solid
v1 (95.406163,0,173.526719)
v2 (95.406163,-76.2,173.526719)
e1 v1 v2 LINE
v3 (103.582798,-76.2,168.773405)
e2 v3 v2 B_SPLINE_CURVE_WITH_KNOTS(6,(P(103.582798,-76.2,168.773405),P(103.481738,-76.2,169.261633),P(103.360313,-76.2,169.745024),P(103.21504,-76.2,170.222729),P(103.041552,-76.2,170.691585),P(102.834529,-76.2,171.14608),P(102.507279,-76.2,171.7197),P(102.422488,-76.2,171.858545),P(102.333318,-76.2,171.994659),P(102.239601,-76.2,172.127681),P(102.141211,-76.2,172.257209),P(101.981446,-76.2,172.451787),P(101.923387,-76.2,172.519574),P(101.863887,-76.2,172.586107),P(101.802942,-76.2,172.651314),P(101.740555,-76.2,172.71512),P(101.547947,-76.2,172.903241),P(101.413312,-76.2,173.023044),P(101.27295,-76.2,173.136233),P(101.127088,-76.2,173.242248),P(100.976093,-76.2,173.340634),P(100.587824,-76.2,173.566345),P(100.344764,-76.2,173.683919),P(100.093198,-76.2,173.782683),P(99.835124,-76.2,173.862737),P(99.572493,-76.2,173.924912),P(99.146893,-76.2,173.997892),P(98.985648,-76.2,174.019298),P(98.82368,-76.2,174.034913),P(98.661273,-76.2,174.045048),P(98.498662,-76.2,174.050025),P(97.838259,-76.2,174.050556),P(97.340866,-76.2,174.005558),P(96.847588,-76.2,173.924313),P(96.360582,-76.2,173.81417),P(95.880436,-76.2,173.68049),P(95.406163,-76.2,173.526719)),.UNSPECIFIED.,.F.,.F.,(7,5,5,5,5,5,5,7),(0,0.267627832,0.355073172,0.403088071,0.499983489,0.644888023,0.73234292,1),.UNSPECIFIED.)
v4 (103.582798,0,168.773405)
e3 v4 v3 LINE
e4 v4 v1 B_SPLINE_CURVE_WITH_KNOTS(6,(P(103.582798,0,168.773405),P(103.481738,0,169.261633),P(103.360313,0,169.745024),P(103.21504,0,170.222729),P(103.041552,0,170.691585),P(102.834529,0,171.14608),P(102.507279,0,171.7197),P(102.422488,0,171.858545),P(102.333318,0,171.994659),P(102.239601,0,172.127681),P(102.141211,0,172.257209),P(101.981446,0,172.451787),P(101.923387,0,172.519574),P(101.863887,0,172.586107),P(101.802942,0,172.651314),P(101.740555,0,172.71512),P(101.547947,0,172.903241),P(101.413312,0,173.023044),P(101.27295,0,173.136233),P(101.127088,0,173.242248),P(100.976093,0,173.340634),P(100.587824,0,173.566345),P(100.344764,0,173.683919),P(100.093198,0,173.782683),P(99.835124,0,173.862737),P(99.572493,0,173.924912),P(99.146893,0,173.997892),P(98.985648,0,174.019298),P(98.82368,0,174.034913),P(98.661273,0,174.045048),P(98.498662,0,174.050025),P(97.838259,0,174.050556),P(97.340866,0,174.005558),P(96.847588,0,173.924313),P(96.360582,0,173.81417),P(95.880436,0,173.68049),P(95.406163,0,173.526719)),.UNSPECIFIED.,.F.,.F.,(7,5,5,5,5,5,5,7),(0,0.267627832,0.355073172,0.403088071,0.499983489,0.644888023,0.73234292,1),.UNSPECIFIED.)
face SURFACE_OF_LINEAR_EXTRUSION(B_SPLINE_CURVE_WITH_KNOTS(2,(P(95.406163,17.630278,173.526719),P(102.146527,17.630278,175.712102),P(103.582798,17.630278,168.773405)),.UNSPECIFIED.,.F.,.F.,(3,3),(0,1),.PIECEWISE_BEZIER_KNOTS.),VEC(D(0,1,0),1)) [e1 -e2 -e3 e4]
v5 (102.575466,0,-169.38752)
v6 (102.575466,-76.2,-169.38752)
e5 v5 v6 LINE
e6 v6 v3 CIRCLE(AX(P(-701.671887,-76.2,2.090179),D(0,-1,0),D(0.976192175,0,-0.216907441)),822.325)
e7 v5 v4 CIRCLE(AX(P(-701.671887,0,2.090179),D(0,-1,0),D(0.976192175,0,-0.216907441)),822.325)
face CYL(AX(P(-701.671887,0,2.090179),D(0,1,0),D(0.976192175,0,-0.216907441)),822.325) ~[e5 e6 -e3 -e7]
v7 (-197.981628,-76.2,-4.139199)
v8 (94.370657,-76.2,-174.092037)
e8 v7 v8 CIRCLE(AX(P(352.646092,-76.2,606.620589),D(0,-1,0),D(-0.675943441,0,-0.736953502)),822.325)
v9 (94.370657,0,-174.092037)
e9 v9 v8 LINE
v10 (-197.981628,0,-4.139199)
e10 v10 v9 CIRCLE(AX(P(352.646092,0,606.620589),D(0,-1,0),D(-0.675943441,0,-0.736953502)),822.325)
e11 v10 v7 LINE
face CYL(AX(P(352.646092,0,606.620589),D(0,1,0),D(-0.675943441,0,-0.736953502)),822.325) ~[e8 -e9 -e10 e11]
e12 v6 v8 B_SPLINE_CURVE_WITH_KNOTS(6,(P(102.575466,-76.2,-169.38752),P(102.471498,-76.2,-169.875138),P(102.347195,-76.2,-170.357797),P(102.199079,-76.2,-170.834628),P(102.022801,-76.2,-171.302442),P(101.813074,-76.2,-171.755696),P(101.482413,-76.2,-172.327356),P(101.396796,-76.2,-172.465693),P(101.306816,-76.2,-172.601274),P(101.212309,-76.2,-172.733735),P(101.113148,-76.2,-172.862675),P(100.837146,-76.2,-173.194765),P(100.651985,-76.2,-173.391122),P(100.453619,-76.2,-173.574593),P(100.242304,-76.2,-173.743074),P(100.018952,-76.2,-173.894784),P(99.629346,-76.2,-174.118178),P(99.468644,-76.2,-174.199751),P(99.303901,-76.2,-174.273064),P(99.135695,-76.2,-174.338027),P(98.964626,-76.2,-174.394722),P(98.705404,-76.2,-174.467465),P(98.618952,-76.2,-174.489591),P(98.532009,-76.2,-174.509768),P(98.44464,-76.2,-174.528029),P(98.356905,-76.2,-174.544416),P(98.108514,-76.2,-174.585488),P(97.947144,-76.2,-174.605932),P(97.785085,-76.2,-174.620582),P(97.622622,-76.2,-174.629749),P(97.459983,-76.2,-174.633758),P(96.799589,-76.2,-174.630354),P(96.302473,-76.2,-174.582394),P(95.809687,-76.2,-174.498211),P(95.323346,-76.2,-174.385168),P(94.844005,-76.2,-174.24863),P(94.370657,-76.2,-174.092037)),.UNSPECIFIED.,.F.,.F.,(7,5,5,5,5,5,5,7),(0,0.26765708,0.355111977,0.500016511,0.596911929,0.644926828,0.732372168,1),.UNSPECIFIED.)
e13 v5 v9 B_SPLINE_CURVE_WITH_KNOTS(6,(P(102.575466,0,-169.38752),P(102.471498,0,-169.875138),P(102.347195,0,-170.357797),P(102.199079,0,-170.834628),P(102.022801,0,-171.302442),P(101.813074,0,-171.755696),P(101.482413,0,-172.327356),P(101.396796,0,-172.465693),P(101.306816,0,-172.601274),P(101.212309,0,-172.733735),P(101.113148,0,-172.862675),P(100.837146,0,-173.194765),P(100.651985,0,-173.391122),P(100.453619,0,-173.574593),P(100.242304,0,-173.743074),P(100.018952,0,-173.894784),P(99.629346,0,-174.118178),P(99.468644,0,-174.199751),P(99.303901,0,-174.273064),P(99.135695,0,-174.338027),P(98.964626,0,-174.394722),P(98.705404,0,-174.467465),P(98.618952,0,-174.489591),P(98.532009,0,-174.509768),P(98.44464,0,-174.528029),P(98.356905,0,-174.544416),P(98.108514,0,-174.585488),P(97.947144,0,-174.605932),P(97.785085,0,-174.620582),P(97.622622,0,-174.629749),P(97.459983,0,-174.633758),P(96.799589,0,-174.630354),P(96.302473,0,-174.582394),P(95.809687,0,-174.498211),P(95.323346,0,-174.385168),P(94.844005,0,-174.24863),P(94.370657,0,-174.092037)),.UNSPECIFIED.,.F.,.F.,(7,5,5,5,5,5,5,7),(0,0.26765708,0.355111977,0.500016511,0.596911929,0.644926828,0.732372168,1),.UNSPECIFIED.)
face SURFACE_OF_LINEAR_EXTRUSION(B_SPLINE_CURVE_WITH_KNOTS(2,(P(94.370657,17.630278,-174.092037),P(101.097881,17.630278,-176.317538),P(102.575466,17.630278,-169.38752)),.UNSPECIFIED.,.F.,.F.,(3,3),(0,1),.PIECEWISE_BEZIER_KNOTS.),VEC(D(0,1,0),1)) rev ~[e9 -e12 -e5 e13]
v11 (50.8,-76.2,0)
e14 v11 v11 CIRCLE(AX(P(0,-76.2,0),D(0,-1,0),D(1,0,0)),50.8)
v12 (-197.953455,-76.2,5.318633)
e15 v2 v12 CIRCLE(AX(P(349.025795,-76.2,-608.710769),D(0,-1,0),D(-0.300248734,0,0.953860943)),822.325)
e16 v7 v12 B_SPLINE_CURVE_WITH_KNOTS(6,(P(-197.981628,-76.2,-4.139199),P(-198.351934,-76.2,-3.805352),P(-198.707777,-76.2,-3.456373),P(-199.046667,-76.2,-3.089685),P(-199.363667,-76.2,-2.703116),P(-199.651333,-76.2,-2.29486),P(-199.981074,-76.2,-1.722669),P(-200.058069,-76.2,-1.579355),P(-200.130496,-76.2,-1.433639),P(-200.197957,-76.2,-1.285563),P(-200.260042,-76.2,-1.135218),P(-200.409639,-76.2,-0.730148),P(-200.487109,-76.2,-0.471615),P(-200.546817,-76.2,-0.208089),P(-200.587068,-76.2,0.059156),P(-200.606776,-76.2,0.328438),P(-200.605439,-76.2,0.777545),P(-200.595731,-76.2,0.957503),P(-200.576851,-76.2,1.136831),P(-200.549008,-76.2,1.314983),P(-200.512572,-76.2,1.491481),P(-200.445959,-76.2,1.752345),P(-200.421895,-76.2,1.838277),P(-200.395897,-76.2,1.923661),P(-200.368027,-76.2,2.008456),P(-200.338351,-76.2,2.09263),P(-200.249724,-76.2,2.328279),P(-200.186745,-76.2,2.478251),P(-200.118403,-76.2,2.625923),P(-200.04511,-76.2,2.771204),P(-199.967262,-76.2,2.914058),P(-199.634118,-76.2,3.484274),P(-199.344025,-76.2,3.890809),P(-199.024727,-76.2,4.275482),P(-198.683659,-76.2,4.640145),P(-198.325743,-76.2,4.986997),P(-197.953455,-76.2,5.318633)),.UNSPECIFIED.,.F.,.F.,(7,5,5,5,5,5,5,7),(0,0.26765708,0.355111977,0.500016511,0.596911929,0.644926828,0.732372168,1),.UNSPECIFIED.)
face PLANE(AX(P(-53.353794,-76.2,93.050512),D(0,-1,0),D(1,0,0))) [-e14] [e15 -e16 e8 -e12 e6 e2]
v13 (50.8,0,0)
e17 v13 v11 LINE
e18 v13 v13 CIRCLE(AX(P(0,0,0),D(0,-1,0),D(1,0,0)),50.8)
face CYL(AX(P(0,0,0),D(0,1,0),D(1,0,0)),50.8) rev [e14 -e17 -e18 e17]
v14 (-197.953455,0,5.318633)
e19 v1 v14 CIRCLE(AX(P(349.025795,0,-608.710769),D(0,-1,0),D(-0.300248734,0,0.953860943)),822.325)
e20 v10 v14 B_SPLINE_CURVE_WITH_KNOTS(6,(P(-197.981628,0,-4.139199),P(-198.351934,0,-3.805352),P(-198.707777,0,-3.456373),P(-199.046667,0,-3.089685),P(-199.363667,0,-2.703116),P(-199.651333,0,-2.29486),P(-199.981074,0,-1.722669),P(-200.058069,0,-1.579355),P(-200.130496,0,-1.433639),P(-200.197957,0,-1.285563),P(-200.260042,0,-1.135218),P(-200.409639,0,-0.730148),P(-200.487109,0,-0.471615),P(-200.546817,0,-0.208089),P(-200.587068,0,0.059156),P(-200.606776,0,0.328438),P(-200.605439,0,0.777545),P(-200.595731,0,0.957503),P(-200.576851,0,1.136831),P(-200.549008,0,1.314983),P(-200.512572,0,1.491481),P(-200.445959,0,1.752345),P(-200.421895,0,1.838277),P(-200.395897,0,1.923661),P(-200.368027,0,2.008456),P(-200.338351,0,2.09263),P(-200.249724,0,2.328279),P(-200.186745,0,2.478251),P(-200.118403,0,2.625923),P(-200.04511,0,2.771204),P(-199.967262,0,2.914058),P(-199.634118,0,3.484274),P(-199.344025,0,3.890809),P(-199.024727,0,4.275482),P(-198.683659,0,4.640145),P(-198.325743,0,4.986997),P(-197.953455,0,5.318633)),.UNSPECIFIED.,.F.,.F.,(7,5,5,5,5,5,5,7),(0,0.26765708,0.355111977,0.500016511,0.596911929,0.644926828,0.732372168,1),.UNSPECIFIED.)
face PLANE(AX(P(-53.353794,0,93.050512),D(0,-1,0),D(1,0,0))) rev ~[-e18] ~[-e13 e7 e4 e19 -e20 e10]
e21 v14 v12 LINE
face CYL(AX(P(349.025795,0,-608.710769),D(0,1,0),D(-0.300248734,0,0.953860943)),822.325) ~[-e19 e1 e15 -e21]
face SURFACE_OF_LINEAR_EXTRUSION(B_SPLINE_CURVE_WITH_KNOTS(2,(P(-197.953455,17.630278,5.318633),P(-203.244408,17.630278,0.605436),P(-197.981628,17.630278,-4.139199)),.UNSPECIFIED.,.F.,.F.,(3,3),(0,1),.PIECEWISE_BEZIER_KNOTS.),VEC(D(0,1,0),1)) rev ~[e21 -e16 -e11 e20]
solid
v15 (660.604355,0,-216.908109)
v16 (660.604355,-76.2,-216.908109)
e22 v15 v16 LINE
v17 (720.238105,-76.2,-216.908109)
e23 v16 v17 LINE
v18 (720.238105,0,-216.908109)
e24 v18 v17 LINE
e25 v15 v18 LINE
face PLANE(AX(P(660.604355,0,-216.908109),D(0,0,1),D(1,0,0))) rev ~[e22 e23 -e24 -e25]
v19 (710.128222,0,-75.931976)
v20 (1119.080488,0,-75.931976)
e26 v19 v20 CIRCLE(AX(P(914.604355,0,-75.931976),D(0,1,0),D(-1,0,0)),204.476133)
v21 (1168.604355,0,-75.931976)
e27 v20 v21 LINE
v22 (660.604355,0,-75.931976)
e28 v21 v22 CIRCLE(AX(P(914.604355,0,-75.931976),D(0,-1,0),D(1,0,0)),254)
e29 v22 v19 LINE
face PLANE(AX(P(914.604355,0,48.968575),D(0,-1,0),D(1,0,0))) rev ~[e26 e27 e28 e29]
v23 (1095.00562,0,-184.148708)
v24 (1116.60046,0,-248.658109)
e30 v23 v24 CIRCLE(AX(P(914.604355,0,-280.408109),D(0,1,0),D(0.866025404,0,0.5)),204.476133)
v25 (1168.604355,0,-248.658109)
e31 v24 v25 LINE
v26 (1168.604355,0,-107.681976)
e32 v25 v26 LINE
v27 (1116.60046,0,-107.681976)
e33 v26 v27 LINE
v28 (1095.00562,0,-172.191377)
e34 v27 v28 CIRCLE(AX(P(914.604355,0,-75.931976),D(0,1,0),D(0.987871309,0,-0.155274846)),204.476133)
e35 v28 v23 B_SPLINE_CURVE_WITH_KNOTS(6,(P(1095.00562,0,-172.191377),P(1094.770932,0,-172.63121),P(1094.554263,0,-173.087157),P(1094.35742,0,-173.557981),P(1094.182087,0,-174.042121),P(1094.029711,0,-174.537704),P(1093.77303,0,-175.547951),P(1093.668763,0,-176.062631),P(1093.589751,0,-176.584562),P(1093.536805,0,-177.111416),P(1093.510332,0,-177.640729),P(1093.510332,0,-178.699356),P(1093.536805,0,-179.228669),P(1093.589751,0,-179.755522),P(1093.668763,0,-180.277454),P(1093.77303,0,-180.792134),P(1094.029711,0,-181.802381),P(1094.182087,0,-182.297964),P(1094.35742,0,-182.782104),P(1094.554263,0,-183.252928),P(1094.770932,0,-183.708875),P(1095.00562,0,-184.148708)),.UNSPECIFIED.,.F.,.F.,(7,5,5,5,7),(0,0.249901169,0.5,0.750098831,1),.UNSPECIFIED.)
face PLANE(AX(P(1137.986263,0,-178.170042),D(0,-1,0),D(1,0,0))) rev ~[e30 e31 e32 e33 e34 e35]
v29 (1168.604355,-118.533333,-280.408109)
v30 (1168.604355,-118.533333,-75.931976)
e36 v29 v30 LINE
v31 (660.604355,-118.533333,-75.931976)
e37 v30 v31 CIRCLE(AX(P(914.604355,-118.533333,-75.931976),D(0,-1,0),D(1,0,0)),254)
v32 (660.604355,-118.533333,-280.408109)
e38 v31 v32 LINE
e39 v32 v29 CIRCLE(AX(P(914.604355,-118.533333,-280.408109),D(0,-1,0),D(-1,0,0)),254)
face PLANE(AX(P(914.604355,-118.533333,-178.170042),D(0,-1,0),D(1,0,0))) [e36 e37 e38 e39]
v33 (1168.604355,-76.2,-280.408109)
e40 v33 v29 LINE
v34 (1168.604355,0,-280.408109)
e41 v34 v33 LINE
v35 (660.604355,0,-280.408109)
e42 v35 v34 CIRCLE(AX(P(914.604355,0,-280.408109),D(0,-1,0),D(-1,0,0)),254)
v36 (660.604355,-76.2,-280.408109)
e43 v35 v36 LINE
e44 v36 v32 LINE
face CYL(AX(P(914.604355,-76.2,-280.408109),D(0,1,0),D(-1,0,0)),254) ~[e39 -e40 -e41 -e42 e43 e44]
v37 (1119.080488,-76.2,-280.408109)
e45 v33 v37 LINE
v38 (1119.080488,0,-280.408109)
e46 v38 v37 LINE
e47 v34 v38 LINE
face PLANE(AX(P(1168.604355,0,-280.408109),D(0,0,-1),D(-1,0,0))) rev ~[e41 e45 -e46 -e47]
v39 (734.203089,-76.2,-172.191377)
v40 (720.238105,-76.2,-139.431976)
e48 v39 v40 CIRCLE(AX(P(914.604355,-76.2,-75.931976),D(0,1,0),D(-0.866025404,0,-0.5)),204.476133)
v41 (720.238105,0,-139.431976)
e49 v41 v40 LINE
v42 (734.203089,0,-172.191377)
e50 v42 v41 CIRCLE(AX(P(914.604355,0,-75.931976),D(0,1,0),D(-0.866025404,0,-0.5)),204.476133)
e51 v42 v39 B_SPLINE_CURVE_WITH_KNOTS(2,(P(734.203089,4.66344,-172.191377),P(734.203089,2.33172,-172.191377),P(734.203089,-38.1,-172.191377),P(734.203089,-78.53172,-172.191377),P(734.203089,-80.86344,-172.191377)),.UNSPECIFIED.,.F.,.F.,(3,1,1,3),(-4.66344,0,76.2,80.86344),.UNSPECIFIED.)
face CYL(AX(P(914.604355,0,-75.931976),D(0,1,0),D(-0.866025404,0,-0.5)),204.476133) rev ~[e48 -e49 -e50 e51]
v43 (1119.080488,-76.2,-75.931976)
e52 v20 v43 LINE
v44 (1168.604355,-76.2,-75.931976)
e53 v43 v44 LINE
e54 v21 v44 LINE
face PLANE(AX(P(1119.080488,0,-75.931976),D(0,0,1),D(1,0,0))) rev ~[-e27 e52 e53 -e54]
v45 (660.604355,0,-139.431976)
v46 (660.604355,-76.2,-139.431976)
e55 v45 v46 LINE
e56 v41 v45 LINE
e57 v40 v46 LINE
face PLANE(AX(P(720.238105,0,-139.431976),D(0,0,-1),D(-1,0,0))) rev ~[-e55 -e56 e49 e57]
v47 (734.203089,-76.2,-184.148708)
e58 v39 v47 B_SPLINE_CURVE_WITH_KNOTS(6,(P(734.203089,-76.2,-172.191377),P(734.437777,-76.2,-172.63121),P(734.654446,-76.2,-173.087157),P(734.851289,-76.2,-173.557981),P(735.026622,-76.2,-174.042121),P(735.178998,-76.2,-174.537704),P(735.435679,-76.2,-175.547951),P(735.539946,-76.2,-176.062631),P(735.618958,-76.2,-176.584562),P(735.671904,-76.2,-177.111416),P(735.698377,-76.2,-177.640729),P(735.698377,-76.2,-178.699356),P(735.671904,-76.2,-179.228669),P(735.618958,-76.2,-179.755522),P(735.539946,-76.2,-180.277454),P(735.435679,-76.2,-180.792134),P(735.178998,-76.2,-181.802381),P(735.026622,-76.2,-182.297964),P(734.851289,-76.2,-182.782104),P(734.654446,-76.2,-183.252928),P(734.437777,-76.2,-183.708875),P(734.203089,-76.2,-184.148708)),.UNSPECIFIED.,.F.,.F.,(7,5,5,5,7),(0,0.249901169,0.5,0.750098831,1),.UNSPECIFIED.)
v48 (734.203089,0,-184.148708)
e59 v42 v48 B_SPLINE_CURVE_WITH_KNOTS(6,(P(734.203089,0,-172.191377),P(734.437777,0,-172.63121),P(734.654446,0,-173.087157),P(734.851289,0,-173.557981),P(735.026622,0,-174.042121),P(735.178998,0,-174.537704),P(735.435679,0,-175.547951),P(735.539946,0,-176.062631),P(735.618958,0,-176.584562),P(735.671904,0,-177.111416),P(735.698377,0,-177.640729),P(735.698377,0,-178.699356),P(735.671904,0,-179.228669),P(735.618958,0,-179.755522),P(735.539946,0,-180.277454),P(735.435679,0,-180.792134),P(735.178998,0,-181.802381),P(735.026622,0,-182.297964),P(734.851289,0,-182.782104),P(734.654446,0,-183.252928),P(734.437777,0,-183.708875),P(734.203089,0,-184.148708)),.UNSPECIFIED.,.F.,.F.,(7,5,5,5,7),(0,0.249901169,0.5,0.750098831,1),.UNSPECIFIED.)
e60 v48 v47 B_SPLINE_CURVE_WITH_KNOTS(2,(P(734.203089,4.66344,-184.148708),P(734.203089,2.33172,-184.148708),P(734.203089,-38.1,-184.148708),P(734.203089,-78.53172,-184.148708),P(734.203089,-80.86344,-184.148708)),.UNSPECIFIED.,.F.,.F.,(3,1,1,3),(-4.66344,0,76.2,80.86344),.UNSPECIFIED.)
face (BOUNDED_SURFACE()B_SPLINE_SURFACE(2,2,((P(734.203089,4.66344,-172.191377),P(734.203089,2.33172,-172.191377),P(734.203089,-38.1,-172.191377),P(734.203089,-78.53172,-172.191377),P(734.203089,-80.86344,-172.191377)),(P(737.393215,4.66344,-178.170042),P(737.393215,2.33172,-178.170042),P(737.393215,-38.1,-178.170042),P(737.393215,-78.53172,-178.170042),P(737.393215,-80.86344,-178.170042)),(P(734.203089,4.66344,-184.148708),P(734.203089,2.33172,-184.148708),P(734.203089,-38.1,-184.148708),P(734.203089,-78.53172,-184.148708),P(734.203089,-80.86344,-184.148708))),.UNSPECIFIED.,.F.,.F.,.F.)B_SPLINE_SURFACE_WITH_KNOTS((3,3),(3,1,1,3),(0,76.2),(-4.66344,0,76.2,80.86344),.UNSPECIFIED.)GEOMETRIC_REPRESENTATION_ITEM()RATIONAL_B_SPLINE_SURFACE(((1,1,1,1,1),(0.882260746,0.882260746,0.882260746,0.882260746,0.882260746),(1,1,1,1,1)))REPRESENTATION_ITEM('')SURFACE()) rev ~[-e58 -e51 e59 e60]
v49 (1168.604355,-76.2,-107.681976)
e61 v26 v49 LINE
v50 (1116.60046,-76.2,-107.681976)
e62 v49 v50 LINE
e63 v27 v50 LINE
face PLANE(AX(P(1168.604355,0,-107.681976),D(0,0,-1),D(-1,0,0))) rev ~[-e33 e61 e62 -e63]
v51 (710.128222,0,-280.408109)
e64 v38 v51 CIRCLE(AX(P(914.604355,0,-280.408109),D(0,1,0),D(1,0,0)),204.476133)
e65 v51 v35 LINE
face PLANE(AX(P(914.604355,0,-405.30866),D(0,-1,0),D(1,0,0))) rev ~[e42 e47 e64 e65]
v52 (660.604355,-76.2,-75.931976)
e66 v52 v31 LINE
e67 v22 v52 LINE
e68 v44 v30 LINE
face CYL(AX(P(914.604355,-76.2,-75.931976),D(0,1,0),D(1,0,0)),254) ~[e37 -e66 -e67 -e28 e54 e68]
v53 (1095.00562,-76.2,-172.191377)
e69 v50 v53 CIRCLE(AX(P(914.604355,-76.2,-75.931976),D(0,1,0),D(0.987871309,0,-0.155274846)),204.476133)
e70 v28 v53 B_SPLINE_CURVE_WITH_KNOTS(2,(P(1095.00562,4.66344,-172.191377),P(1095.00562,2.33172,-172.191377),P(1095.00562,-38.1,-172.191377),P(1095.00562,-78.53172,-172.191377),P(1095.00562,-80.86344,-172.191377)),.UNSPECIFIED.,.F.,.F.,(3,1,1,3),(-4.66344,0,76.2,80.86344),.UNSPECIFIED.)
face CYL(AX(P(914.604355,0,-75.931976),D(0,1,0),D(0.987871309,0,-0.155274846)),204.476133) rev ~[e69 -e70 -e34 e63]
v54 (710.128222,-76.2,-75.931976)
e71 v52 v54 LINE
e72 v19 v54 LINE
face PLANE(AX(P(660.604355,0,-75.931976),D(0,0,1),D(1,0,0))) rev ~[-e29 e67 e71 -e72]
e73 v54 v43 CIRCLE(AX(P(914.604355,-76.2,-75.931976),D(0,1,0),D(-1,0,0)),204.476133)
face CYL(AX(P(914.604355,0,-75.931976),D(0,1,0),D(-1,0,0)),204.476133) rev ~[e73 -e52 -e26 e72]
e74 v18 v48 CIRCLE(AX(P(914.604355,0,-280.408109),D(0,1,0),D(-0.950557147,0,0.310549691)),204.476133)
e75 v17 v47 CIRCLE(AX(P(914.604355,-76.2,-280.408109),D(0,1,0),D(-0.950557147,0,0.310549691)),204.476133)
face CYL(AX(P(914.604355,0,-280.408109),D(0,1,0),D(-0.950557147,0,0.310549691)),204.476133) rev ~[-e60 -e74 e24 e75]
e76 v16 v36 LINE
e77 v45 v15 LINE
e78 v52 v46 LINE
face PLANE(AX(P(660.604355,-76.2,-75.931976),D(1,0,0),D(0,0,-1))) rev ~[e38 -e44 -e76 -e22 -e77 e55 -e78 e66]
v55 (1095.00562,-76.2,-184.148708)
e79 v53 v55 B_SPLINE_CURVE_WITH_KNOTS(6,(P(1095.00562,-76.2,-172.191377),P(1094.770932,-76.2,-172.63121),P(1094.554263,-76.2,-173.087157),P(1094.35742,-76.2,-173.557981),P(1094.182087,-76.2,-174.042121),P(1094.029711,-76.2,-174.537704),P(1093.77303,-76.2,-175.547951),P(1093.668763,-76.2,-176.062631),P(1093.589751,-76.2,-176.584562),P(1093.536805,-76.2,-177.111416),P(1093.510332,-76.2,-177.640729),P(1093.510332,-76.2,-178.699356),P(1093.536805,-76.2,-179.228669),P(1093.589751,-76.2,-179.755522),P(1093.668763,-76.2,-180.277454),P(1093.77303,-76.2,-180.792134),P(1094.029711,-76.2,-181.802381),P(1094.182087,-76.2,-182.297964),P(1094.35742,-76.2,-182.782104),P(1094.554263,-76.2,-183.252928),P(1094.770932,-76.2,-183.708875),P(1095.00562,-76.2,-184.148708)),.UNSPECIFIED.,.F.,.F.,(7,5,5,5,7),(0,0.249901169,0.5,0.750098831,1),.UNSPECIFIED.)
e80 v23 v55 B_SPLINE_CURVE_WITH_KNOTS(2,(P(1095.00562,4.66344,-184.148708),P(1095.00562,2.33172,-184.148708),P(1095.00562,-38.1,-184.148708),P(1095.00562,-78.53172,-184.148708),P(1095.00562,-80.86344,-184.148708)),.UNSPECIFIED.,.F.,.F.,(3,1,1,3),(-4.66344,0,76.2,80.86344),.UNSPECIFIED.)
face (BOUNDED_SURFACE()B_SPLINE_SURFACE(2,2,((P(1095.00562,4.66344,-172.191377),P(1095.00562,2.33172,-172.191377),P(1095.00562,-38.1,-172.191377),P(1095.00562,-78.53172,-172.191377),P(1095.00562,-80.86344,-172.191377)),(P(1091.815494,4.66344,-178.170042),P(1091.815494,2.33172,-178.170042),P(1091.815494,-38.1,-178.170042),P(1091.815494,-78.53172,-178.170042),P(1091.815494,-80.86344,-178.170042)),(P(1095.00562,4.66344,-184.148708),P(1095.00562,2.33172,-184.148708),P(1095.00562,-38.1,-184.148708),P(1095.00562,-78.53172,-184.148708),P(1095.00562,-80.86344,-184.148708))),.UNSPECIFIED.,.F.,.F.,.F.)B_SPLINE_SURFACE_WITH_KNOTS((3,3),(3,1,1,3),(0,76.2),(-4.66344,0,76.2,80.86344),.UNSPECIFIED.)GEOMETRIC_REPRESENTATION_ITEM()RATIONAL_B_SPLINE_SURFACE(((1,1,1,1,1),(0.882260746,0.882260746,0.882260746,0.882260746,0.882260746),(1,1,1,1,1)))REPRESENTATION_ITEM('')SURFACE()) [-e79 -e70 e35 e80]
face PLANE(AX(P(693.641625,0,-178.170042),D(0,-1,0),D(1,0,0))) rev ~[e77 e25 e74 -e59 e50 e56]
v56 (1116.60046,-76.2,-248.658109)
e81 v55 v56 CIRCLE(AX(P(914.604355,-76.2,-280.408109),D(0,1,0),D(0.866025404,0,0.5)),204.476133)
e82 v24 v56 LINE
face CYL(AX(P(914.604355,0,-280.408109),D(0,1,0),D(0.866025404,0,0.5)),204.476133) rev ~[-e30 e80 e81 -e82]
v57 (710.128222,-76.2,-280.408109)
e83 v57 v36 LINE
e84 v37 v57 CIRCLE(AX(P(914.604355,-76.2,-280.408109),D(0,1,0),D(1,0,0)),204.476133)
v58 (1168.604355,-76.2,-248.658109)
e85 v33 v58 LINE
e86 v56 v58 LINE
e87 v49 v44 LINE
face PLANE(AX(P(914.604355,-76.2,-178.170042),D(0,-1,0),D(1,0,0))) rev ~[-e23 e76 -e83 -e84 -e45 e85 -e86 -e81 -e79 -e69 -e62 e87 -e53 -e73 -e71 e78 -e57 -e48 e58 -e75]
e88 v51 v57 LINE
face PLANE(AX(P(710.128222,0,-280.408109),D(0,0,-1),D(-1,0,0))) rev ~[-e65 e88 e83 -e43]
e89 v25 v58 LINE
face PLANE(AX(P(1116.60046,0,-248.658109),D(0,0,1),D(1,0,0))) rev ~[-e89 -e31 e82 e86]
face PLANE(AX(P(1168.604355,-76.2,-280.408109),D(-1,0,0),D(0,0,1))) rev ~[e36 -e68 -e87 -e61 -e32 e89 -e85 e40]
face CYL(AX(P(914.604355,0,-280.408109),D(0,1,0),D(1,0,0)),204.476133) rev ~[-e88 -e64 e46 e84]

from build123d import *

# Parameters (mm, degrees)
F1_DEPTH    = 76.2
F2_R        = 12.7
F2_2_R      = 12.7
F4_DEPTH    = 42.3333333342
F5_R        = 50.8
F6_DEPTH    = 76.2
F7_T1_DEPTH = 111.4605556754


# Not quite as in the source:
# - a fillet or chamfer that OpenCascade refuses, or shapes differently, is made with other operations: its cross-section is extruded or revolved along the edge and cut away or added


with BuildPart() as f1:
    # F0 (on Front) → F1 (new body)
    with BuildSketch(Plane.XZ):
        with BuildLine():
            ThreePointArc((710.1282216017, -75.9319759618), (914.6043545827, 128.5441570192), (1119.0804875637, -75.9319759618))
            Line((1119.0804875637, -75.9319759618), (1168.6043545827, -75.9319759618))
            ThreePointArc((1168.6043545827, -75.9319759618), (914.6043545827, 178.0680240382), (660.6043545827, -75.9319759618))
            Line((660.6043545827, -75.9319759618), (710.1282216017, -75.9319759618))
        make_face()
    extrude(amount=F1_DEPTH)



with BuildPart() as f1b:
    # F0 (on Front) → F1, piece 2 (new body)
    with BuildSketch(Plane.XZ):
        with BuildLine():
            Line((1168.6043545827, -107.6819759618), (1116.6004596413, -107.6819759618))
            ThreePointArc((1116.6004596413, -107.6819759618), (1107.3920730747, -144.0743604042), (1091.6858802118, -178.1700424523))
            ThreePointArc((1091.6858802118, -178.1700424523), (1107.3920730747, -212.2657245004), (1116.6004596413, -248.6581089428))
            Line((1116.6004596413, -248.6581089428), (1168.6043545827, -248.6581089428))
            Line((1168.6043545827, -248.6581089428), (1168.6043545827, -107.6819759618))
        make_face()
    extrude(amount=F1_DEPTH)

    # F2#2
    f2_2_edges = [f1b.edges().sort_by_distance(p)[0] for p in [
        (1091.68588, -38.1, -178.170042),
    ]]
    fillet(f2_2_edges, radius=F2_2_R)


with BuildPart() as f1c:
    # F0 (on Front) → F1, piece 3 (new body)
    with BuildSketch(Plane.XZ):
        with BuildLine():
            ThreePointArc((737.5228289535, -178.1700424523), (727.8732059552, -159.2504438494), (720.2381050462, -139.4319759618))
            Line((720.2381050462, -139.4319759618), (660.6043545827, -139.4319759618))
            Line((660.6043545827, -139.4319759618), (660.6043545827, -216.9081089428))
            Line((660.6043545827, -216.9081089428), (720.2381050462, -216.9081089428))
            ThreePointArc((720.2381050462, -216.9081089428), (727.8732059552, -197.0896410552), (737.5228289535, -178.1700424523))
        make_face()
    extrude(amount=F1_DEPTH)

    # F2
    f2_edges = [f1c.edges().sort_by_distance(p)[0] for p in [
        (737.522829, -38.1, -178.170042),
    ]]
    fillet(f2_edges, radius=F2_R)


with BuildPart() as f1d:
    # F0 (on Front) → F1, piece 4 (new body)
    with BuildSketch(Plane.XZ):
        with BuildLine():
            Line((1168.6043545827, -280.4081089428), (1119.0804875637, -280.4081089428))
            ThreePointArc((1119.0804875637, -280.4081089428), (914.6043545827, -484.8842419238), (710.1282216017, -280.4081089428))
            Line((710.1282216017, -280.4081089428), (660.6043545827, -280.4081089428))
            ThreePointArc((660.6043545827, -280.4081089428), (914.6043545827, -534.4081089428), (1168.6043545827, -280.4081089428))
        make_face()
    extrude(amount=F1_DEPTH)


with BuildPart() as f1_1:
    add(f1.part)

    add(f1b.part)  # F4 merges F1b

    add(f1c.part)  # F4 merges F1c

    add(f1d.part)  # F4 merges F1d
    # F3 (on face) → F4 (join)
    with BuildSketch(Plane.XZ.offset(76.2)):
        with BuildLine():
            Line((1168.6043545827, -280.4081089428), (1168.6043545827, -75.9319759618))
            ThreePointArc((1168.6043545827, -75.9319759618), (914.6043545827, 178.0680240382), (660.6043545827, -75.9319759618))
            Line((660.6043545827, -75.9319759618), (660.6043545827, -280.4081089428))
            ThreePointArc((660.6043545827, -280.4081089428), (914.6043545827, -534.4081089428), (1168.6043545827, -280.4081089428))
        make_face()
    extrude(amount=F4_DEPTH)


with BuildPart() as f6:
    # F5 (on Front) → F6 (new body)
    with BuildSketch(Plane.XZ):
        with BuildLine():
            ThreePointArc((102.1237551128, 175.6729308734), (-60.0134851065, 104.6652000685), (-203.1990984501, 0.6053008208))
            Line((-203.1990984501, 0.6053008208), (102.1237551128, 175.6729308734))
        make_face()
        Polygon((102.1237551128, 175.6729308734), (-203.1990984501, 0.6053008208), (101.0753433373, -176.2782316942), align=None)
        Circle(F5_R, mode=Mode.SUBTRACT)
        with BuildLine():
            Line((101.0753433373, -176.2782316942), (-203.1990984501, 0.6053008208))
            ThreePointArc((-203.1990984501, 0.6053008208), (-60.6359795982, -104.3058027061), (101.0753433373, -176.2782316942))
        make_face()
        with BuildLine():
            ThreePointArc((101.0753433373, -176.2782316942), (120.6494647047, -0.3593973623), (102.1237551128, 175.6729308734))
            Line((102.1237551128, 175.6729308734), (101.0753433373, -176.2782316942))
        make_face()
    extrude(amount=F6_DEPTH)

    # F7: fillet of radius 6.35 on 3 edges, made by hand

    # F7_s2 → F7_t1 (cut)
    with BuildSketch(Plane.XZ.offset(-17.6302778377)):
        with BuildLine():
            add(Edge.make_bspline(
                [(95.406162744, 173.5267192743), (102.1465266623, 175.7121024143), (103.5827984, 168.7734045022)],
                knots=[0, 0, 0, 1, 1, 1], degree=2, weights=[1, 1, 1]))
            ThreePointArc((103.5827984, 168.7734045022), (102.8606729274, 172.2247317566), (102.1237551128, 175.6729308734))
            ThreePointArc((102.1237551128, 175.6729308734), (98.7626582273, 174.6070262148), (95.406162744, 173.5267192743))
        make_face()
        with BuildLine():
            add(Edge.make_bspline(
                [(94.3706565821, -174.0920370606), (101.097881112, -176.3175382051), (102.5754657549, -169.387520251)],
                knots=[0, 0, 0, 1, 1, 1], degree=2, weights=[1, 1, 1]))
            ThreePointArc((102.5754657549, -169.387520251), (101.8327912676, -172.8344840775), (101.0753433373, -176.2782316942))
            ThreePointArc((101.0753433373, -176.2782316942), (97.7206563975, -175.1923216837), (94.3706565821, -174.0920370606))
        make_face()
        with BuildLine():
            add(Edge.make_bspline(
                [(-197.9534549821, 5.3186325584), (-203.2444077743, 0.6054357907), (-197.9816284989, -4.1391990233)],
                knots=[0, 0, 0, 1, 1, 1], degree=2, weights=[1, 1, 1]))
            ThreePointArc((-197.9816284989, -4.1391990233), (-200.5954494949, -1.7725421373), (-203.1990984501, 0.6053008208))
            ThreePointArc((-203.1990984501, 0.6053008208), (-200.5813293248, 2.9675899272), (-197.9534549821, 5.3186325584))
        make_face()
    extrude(amount=F7_T1_DEPTH, mode=Mode.SUBTRACT)


solid = Compound([f1_1.part, f6.part])
